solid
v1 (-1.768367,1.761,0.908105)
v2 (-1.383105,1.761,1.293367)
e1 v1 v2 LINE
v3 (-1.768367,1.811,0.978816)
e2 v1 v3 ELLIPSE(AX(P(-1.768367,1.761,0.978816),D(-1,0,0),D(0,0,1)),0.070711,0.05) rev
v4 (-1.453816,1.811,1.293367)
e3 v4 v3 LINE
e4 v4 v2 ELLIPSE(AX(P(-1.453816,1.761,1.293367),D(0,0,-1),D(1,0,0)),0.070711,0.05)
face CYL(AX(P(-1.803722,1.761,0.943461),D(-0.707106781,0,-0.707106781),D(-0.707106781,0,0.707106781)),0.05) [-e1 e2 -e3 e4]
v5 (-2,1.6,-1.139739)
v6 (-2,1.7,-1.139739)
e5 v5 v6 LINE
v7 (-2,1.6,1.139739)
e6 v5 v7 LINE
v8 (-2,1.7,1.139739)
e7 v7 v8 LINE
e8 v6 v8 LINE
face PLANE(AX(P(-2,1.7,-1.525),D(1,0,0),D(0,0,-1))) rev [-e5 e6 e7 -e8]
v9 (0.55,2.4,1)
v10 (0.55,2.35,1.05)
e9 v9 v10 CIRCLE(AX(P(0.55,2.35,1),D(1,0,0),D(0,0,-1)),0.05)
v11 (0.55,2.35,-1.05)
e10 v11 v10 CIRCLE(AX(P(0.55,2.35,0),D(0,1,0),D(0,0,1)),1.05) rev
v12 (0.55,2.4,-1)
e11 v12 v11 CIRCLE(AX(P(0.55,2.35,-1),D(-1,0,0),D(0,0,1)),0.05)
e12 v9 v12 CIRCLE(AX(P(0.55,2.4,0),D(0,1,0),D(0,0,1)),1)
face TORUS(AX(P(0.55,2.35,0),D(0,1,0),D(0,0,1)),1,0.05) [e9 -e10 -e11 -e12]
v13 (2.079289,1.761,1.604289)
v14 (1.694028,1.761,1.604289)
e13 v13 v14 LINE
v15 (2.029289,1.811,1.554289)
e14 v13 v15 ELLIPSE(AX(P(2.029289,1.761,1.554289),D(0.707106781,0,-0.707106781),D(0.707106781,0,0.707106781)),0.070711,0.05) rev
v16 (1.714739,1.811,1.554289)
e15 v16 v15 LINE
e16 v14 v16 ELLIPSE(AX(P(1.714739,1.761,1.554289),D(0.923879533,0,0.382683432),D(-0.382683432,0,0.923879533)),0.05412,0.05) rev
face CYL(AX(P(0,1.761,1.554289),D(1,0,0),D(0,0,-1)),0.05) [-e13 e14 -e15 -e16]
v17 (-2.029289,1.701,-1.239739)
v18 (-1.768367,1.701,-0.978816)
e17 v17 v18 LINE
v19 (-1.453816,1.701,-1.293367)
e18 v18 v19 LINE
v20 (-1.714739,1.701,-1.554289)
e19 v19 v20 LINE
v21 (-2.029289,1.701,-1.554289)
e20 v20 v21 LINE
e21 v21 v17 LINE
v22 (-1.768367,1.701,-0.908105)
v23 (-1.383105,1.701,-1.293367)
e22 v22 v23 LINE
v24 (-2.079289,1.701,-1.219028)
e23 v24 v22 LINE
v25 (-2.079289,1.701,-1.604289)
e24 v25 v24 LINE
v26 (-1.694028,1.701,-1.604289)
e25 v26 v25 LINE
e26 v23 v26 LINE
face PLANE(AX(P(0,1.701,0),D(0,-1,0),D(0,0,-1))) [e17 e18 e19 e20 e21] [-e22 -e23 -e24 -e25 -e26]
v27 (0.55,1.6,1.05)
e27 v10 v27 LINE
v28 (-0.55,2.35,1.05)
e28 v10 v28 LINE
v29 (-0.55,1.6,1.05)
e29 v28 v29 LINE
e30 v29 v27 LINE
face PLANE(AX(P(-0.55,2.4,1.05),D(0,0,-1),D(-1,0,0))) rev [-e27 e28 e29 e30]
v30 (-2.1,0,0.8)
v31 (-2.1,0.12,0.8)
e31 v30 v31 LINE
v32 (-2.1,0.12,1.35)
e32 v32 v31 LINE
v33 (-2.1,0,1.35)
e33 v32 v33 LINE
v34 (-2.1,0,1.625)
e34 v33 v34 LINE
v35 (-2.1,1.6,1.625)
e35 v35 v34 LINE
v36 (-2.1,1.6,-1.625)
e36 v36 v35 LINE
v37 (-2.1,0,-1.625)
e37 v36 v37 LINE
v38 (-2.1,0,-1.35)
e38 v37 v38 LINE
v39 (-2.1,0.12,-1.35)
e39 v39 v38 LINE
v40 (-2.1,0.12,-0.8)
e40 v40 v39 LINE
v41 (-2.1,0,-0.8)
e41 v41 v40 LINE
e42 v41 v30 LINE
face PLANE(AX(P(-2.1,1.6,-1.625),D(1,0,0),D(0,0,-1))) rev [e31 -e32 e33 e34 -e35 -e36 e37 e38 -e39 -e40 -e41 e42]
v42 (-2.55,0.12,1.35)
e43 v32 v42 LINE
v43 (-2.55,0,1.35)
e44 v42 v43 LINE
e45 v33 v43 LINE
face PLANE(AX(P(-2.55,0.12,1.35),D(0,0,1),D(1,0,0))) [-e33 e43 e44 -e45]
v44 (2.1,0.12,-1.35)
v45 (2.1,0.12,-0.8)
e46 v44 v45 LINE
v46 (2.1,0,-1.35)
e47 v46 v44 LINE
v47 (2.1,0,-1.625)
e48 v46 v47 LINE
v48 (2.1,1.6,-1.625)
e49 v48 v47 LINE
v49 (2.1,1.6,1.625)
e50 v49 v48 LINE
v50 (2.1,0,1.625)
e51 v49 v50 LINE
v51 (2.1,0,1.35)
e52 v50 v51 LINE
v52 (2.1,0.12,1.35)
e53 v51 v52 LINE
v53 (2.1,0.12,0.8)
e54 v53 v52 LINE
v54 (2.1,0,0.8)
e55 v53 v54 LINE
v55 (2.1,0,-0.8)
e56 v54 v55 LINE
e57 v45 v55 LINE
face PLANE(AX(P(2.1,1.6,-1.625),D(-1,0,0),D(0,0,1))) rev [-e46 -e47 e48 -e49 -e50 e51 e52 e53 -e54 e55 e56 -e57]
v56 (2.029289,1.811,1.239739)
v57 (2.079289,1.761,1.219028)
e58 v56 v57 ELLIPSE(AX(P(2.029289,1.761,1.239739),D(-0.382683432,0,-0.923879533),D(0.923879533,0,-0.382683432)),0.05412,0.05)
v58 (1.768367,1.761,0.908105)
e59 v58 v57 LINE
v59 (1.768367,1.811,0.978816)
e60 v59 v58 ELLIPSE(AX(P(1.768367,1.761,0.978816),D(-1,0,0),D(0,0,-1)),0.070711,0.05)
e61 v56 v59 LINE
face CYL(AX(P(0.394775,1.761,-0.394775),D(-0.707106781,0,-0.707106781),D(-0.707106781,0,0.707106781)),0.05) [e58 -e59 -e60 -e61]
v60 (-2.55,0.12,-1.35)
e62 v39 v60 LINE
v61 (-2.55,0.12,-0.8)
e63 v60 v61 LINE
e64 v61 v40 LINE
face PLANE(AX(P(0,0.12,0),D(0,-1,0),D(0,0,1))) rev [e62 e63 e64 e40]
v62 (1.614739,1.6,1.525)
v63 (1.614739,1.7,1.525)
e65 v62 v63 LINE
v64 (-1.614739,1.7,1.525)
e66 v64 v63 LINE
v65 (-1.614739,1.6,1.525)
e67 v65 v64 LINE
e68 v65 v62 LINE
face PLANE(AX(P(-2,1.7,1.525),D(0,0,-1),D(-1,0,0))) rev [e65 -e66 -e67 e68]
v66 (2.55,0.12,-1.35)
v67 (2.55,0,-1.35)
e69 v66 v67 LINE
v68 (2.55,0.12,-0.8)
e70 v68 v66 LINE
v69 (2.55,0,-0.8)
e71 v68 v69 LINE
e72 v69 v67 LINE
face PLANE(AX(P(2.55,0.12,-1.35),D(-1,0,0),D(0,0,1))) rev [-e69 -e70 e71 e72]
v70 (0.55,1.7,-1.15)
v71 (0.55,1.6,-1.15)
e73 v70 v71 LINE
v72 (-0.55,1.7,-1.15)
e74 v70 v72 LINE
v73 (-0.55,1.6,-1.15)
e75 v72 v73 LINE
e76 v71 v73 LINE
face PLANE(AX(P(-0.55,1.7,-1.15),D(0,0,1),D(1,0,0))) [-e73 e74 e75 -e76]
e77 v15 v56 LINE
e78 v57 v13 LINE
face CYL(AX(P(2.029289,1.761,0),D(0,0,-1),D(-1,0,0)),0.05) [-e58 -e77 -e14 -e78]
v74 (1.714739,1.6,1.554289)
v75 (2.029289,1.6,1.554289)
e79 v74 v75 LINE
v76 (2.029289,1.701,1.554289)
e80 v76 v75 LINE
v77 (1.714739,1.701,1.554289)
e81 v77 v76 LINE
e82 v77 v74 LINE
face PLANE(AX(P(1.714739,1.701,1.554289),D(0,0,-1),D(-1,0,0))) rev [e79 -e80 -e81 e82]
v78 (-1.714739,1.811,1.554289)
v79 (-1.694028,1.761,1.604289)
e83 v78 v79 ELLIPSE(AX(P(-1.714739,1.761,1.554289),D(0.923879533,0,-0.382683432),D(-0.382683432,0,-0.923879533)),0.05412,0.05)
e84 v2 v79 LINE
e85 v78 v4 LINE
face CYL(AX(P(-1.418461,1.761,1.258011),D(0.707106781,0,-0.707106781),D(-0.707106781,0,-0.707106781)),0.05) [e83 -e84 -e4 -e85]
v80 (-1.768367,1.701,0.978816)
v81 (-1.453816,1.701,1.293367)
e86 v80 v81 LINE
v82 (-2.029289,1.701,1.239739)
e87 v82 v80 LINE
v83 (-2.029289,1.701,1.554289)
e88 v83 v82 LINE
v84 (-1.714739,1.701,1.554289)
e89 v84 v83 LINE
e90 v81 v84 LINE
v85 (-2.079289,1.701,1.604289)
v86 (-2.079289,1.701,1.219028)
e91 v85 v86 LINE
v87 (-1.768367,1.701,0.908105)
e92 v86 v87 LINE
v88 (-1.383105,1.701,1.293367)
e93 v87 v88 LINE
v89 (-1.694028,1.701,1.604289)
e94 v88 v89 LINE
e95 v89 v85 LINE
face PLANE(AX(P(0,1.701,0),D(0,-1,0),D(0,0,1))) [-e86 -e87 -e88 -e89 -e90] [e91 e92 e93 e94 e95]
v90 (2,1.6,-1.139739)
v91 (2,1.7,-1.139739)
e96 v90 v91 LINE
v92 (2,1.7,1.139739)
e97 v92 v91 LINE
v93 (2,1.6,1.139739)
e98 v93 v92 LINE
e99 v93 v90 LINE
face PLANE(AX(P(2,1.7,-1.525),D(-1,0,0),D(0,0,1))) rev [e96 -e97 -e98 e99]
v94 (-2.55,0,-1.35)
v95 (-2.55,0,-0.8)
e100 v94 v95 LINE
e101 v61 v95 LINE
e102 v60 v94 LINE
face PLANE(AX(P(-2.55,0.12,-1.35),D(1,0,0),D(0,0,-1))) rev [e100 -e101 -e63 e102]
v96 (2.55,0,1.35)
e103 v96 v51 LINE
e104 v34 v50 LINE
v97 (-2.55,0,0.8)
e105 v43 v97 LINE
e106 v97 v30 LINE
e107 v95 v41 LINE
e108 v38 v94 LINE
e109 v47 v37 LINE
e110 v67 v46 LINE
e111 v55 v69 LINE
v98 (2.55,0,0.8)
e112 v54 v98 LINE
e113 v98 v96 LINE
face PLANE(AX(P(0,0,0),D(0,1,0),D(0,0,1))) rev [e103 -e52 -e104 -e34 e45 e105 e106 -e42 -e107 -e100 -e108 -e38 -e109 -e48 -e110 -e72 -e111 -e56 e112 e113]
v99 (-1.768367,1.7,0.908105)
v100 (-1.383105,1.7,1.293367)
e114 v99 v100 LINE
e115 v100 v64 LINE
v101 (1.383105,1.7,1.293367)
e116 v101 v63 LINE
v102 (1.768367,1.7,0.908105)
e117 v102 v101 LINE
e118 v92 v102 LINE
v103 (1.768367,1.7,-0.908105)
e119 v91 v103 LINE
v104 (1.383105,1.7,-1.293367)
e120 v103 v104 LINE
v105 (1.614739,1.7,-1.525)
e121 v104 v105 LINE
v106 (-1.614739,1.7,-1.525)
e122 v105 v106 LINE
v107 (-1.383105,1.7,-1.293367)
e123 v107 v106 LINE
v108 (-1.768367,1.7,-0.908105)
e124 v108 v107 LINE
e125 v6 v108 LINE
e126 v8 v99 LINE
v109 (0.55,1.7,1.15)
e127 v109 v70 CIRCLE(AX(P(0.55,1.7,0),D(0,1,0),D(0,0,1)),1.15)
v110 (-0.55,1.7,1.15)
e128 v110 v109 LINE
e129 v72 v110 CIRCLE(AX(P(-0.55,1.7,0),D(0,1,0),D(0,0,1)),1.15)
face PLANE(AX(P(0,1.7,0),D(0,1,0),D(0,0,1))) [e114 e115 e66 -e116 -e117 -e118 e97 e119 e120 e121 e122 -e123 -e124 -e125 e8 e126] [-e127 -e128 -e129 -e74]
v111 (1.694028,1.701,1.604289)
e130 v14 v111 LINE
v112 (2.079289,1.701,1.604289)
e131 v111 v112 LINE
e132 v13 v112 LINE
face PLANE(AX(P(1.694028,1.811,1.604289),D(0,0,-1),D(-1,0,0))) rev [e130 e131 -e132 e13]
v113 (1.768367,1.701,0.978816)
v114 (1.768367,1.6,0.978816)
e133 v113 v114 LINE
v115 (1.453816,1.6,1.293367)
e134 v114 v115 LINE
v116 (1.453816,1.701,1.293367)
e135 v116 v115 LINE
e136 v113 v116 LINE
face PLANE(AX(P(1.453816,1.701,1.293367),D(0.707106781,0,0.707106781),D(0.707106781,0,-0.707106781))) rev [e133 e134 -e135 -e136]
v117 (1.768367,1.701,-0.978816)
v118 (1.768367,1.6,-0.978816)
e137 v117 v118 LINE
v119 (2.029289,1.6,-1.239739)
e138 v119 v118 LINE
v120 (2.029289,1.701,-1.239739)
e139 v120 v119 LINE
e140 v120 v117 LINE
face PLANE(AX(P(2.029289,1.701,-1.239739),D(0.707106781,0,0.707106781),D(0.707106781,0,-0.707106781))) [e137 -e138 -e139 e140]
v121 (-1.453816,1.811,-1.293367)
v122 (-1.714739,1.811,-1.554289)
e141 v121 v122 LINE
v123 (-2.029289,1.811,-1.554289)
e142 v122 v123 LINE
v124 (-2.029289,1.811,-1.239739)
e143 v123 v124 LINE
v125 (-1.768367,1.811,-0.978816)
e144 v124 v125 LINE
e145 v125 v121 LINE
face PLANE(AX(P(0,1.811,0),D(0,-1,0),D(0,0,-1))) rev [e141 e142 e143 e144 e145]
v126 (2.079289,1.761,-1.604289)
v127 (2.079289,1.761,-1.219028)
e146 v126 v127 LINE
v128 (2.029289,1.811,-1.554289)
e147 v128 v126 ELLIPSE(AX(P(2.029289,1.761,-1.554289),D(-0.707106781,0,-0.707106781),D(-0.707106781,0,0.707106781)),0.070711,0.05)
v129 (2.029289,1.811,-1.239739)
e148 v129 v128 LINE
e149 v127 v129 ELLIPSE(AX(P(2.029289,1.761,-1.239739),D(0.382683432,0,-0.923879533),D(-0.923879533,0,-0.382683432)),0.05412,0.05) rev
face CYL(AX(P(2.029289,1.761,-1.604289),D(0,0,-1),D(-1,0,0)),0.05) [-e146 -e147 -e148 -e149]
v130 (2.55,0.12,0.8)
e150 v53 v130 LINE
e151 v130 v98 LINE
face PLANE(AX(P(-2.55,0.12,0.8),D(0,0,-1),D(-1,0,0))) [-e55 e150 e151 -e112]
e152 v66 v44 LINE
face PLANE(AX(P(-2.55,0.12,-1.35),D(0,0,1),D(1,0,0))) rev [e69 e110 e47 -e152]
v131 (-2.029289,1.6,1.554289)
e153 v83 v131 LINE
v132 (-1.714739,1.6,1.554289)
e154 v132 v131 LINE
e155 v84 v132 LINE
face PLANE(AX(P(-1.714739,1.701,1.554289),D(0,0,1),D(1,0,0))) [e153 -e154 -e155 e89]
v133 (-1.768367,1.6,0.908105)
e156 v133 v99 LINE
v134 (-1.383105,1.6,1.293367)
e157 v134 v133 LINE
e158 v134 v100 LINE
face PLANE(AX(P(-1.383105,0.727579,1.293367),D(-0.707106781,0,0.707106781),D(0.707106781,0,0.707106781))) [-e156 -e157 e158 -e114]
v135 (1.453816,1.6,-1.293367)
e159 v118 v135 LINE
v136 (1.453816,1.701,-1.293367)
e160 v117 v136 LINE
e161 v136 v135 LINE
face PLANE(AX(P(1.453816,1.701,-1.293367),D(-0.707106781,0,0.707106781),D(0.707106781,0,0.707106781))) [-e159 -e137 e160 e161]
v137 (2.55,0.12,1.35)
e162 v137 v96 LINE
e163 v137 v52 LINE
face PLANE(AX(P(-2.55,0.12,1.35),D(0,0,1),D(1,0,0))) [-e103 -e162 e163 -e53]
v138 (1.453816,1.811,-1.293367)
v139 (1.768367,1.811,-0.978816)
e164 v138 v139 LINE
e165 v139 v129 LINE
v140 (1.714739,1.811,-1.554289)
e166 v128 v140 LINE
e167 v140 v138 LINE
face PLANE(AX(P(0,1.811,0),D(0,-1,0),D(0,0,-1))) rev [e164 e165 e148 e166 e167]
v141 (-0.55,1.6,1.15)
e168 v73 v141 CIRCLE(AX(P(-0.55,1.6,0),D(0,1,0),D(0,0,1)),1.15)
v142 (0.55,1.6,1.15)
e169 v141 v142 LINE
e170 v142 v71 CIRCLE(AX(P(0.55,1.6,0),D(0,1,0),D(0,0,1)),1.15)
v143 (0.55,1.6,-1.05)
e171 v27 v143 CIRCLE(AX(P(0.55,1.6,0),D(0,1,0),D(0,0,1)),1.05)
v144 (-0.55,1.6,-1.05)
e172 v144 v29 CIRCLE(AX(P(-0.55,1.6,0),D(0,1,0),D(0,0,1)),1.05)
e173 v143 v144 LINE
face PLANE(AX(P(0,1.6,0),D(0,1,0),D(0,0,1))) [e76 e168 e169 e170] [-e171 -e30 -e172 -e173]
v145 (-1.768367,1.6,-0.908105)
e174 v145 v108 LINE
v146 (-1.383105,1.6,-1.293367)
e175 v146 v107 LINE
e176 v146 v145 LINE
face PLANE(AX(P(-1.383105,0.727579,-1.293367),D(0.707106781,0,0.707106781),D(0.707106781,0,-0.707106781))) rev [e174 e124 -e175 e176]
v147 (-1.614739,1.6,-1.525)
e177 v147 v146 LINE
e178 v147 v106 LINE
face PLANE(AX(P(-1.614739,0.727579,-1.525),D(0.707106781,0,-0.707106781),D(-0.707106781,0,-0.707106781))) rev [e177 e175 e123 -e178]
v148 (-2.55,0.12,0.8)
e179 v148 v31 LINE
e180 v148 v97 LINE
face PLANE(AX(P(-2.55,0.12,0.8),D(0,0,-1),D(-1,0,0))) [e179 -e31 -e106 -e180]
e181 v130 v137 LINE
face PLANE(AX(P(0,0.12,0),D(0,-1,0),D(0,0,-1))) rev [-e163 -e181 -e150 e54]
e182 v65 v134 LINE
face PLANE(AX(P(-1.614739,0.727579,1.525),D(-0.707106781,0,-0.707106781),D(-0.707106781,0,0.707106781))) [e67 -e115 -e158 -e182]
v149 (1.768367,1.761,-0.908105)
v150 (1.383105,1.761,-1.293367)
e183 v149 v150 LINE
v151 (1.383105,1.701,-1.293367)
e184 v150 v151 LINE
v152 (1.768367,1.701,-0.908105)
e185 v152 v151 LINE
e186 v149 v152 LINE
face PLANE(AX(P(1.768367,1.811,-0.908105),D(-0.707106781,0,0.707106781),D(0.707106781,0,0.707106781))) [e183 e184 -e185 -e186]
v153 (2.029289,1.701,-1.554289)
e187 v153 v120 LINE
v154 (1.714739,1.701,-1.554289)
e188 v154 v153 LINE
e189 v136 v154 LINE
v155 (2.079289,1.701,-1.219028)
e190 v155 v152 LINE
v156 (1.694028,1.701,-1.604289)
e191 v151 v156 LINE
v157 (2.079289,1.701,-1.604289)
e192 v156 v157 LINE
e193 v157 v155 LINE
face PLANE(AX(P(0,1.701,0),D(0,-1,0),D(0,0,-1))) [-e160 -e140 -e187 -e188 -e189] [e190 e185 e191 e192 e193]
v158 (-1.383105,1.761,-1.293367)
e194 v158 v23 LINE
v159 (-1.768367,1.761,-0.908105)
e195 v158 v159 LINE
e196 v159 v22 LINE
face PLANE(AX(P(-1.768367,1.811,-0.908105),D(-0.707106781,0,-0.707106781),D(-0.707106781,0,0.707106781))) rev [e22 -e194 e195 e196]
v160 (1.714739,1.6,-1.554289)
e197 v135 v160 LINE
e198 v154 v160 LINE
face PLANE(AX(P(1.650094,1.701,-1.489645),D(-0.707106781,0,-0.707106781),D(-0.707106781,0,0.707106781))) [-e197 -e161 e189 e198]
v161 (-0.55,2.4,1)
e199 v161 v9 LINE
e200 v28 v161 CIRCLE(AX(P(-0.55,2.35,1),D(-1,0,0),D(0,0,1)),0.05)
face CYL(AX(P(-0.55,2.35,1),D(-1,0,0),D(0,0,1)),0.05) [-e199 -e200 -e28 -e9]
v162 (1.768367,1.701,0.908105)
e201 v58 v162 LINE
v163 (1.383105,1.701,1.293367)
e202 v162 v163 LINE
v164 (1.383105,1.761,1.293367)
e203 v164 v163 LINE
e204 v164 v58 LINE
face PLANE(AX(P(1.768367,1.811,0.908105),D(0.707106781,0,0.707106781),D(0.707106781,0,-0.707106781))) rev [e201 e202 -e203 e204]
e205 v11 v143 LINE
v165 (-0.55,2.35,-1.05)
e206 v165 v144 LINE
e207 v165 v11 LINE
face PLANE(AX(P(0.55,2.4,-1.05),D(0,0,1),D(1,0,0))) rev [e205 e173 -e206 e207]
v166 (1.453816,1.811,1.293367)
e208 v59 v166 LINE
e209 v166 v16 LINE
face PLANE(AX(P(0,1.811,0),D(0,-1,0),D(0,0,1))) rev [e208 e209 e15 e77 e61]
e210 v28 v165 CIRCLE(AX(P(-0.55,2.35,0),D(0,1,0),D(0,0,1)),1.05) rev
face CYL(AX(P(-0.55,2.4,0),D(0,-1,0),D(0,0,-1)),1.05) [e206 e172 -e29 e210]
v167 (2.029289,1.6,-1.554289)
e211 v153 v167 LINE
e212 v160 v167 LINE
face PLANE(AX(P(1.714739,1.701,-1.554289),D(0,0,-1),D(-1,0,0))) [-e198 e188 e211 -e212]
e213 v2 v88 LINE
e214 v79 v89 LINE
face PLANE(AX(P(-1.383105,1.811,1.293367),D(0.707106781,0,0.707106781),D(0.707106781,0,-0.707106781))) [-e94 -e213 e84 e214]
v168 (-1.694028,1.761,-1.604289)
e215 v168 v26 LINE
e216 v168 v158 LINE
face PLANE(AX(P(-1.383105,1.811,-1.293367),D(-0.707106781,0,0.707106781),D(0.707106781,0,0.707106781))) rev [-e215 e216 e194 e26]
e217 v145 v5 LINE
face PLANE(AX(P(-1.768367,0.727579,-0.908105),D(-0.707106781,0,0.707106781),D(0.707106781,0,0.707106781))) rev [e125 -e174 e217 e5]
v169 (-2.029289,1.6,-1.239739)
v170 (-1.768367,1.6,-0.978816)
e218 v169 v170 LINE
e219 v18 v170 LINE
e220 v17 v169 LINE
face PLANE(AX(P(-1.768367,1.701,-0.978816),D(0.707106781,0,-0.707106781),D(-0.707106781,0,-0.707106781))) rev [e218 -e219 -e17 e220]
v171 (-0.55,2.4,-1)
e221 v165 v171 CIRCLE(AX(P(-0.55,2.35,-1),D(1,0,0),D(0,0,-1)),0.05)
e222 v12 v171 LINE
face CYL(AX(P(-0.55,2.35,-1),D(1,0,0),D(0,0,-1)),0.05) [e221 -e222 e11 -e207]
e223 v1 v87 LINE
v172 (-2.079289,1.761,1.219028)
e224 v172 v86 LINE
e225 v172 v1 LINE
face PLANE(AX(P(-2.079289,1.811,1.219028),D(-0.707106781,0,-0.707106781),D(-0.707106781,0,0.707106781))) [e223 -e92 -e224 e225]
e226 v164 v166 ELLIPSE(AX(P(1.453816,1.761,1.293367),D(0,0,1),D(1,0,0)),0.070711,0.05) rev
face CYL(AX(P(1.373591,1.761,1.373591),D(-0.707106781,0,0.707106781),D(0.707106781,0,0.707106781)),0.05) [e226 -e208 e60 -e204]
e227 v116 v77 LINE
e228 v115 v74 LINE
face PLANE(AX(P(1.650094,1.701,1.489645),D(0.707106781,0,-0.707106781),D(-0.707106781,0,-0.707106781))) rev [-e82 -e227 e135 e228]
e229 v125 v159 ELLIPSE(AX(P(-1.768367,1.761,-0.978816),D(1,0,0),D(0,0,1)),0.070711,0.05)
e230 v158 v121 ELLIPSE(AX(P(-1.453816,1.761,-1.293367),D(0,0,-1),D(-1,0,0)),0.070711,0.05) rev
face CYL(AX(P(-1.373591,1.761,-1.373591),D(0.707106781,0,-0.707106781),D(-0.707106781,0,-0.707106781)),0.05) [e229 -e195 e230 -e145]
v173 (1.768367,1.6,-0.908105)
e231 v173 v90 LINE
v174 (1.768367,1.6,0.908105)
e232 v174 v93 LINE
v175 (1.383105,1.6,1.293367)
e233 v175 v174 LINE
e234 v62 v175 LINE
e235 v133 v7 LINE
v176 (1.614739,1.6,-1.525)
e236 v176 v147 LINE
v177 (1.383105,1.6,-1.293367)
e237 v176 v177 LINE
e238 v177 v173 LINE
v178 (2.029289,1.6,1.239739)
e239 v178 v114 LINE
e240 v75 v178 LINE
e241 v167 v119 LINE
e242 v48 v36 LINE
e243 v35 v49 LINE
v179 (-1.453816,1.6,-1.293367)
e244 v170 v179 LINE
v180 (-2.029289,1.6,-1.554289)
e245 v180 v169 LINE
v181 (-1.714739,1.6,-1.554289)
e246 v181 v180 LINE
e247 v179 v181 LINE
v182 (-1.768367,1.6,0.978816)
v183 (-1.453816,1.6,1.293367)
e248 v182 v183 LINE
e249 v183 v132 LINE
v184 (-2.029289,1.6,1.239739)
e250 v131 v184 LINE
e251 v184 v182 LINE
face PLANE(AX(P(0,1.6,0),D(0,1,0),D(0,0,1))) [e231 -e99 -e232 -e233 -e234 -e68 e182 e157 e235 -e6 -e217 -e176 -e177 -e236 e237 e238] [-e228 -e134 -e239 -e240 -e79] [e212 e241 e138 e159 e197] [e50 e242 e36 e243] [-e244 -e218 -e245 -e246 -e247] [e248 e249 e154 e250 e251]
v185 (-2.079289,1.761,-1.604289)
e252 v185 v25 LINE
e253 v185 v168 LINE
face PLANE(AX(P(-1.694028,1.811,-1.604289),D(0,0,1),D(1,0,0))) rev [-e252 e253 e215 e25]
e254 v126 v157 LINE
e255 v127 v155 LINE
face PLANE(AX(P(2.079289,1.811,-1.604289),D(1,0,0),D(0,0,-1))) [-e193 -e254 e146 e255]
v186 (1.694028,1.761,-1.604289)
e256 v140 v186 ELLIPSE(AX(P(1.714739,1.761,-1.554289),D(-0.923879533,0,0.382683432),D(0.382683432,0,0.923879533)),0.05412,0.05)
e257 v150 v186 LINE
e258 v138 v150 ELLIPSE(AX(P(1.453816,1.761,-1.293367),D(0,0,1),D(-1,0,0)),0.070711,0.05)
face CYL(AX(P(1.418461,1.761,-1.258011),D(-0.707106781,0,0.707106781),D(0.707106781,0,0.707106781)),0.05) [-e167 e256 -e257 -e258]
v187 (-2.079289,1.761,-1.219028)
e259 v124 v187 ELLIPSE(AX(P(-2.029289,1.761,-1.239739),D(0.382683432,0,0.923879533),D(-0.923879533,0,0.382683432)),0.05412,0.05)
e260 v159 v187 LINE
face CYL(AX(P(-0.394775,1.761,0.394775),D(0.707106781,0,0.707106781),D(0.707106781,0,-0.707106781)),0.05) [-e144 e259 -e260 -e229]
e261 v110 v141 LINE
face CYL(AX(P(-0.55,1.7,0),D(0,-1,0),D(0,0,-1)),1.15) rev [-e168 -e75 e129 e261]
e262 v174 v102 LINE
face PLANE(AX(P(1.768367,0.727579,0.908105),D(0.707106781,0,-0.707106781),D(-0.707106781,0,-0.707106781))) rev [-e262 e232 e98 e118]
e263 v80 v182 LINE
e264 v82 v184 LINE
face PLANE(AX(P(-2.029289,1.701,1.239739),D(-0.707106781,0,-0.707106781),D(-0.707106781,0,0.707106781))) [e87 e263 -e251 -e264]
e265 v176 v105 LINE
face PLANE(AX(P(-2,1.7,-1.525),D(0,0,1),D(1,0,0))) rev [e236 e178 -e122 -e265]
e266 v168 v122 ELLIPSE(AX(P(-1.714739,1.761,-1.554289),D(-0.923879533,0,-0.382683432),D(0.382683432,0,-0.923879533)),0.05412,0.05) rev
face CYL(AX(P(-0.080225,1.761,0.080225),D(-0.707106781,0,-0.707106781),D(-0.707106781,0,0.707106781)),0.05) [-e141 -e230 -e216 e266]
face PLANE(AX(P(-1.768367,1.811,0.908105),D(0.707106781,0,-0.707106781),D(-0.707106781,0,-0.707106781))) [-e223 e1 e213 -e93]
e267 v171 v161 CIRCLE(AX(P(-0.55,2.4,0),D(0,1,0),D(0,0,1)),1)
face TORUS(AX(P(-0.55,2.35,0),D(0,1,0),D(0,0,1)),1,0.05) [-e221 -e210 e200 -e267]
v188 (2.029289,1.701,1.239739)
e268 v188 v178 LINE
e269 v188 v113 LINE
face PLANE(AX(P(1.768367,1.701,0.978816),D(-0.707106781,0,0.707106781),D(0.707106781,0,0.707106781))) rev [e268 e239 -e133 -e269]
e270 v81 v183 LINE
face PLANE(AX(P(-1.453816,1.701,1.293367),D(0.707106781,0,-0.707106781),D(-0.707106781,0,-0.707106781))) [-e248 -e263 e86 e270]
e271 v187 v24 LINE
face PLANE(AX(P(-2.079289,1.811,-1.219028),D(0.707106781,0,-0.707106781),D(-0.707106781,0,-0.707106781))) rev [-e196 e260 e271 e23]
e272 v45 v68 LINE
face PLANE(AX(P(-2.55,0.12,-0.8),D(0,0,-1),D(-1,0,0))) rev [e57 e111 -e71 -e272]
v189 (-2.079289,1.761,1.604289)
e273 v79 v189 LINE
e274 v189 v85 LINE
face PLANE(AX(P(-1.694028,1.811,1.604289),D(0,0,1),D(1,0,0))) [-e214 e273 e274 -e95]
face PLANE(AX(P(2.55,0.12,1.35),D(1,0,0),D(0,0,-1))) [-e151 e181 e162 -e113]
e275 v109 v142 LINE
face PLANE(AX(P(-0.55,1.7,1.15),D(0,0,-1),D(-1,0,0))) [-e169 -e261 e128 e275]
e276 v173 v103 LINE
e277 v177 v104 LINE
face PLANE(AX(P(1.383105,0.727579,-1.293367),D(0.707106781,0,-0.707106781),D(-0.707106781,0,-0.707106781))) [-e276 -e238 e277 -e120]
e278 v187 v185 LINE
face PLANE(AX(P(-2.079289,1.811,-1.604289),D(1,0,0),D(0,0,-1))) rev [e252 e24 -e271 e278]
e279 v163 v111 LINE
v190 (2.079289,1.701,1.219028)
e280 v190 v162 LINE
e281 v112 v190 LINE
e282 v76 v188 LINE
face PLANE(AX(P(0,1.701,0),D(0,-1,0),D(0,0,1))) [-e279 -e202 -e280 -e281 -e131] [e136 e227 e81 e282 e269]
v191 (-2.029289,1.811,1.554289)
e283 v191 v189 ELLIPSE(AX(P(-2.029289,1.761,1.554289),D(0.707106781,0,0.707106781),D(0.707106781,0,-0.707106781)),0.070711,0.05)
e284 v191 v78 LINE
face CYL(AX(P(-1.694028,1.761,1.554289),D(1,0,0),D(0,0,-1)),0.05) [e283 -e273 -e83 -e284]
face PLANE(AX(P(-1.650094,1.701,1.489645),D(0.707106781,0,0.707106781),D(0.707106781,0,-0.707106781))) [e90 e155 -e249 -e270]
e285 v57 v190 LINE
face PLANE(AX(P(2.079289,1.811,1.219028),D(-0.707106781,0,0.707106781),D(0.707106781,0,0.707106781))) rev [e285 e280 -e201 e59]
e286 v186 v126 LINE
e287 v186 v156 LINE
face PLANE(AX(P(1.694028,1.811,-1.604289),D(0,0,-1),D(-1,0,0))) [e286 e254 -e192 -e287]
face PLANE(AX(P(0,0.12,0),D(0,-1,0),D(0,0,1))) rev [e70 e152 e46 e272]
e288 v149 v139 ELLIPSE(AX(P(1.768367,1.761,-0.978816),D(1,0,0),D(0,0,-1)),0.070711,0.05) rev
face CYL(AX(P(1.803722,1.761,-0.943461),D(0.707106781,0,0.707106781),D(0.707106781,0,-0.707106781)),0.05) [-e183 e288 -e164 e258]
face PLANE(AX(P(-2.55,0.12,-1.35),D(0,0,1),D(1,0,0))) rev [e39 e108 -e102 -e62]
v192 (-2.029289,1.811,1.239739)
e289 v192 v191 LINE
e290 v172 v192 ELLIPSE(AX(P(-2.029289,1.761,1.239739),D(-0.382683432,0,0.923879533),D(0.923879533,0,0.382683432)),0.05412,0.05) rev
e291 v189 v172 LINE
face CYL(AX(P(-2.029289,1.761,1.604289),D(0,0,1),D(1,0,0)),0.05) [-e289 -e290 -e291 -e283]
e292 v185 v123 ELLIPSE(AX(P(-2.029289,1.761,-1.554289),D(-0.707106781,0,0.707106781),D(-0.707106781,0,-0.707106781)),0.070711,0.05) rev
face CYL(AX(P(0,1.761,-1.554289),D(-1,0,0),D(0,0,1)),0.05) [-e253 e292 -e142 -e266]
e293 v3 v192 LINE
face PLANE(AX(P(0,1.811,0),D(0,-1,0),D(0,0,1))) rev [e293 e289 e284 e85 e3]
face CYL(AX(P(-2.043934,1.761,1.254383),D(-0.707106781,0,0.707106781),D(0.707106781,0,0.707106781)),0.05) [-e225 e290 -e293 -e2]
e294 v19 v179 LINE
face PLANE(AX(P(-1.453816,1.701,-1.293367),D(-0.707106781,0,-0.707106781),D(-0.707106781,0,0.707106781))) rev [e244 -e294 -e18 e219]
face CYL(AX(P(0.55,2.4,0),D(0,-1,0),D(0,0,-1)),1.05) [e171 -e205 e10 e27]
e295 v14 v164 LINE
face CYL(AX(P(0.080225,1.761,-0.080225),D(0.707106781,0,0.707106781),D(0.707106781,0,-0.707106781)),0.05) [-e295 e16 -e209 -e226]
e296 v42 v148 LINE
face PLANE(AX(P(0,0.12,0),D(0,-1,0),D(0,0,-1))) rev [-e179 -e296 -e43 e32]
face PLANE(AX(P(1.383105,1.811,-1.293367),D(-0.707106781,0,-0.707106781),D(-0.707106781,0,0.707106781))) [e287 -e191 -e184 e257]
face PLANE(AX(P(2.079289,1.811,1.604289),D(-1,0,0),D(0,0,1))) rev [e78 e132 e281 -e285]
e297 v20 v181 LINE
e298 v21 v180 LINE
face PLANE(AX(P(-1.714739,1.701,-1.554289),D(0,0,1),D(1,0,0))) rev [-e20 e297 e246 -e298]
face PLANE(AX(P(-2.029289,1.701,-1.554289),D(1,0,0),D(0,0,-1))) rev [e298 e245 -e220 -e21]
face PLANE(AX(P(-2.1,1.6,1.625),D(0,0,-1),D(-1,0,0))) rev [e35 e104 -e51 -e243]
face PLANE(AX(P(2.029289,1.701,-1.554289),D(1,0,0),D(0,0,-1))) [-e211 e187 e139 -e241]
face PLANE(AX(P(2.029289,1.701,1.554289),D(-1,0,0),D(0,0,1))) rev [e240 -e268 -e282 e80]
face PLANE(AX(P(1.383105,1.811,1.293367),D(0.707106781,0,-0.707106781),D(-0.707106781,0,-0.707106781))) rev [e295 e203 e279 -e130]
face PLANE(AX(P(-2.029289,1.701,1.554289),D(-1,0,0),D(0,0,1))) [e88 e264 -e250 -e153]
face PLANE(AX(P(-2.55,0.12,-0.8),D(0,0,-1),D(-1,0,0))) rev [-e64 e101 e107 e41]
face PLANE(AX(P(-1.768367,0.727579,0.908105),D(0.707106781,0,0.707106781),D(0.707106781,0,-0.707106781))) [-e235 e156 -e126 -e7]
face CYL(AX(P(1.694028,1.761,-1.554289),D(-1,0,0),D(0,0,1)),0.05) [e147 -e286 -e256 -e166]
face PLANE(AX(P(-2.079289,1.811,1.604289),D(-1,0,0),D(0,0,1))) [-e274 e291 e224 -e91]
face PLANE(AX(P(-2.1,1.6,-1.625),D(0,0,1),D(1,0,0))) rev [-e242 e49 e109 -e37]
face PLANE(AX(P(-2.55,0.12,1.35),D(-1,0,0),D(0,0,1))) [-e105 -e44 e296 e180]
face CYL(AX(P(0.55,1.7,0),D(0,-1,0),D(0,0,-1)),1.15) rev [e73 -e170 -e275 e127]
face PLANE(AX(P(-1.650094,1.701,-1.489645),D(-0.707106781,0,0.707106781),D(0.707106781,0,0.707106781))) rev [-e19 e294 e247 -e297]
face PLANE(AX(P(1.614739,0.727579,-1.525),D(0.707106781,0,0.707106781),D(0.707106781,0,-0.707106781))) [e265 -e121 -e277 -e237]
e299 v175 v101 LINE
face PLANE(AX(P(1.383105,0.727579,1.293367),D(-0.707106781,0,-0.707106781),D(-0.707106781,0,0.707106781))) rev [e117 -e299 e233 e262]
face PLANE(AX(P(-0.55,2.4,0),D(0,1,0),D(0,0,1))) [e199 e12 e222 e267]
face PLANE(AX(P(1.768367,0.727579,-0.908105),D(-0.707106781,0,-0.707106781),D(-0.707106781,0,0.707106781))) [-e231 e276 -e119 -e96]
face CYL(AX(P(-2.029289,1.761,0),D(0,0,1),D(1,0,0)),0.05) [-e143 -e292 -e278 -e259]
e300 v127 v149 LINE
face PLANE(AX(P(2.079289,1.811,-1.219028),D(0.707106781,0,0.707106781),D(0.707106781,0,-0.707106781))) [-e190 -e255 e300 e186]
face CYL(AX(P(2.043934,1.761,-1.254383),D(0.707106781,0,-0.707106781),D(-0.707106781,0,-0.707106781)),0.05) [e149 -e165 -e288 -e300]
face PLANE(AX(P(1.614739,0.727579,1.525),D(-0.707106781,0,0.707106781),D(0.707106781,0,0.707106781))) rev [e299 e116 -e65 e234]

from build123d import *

# Parameters (mm, degrees)
SKETCH1_W            = 4.2
SKETCH1_H            = 3.25
BOSS_EXTRUDE1_DEPTH  = 1.6
SKETCH2_W            = 4
SKETCH2_H            = 3.05
BOSS_EXTRUDE2_DEPTH  = 0.1
BOSS_EXTRUDE3_DEPTH  = 0.8
SKETCH4_W            = 5.1
SKETCH4_H            = 0.55
LEAD_DEPTH           = 0.12
FILLET1_R            = 0.05
CUT_EXTRUDE1_DEPTH   = 0.1
MIRROR4_COPY_1_DEPTH = 0.1
BOSS_EXTRUDE5_DEPTH  = 0.101
BOSS_EXTRUDE6_DEPTH  = 0.11
FILLET3_R            = 0.05
FILLET3_OF_MIRROR6_R = 0.05


# Read off the part's stored shape, not the designer's step: Mirror7
with BuildPart() as part:
    # Sketch1 → Boss-Extrude1 (new body)
    with BuildSketch(Plane(origin=(0, 0, 0), x_dir=(1, 0, 0), z_dir=(0, 1, 0))):
        Rectangle(SKETCH1_W, SKETCH1_H)
    extrude(amount=BOSS_EXTRUDE1_DEPTH)

    # Sketch2 → Boss-Extrude2 (add)
    with BuildSketch(Plane(origin=(0, 1.6, 0), x_dir=(1, 0, 0), z_dir=(0, 1, 0))):
        Rectangle(SKETCH2_W, SKETCH2_H)
        with BuildLine():
            Line((-0.55, 1.15), (0.55, 1.15))
            ThreePointArc((0.55, 1.15), (1.7, 0), (0.55, -1.15))
            Line((0.55, -1.15), (-0.55, -1.15))
            ThreePointArc((-0.55, -1.15), (-1.7, 0), (-0.55, 1.15))
        make_face(mode=Mode.SUBTRACT)
    extrude(amount=BOSS_EXTRUDE2_DEPTH)

    # Sketch3 → Boss-Extrude3 (add)
    with BuildSketch(Plane(origin=(0, 1.6, 0), x_dir=(1, 0, 0), z_dir=(0, 1, 0))):
        with BuildLine():
            Line((-0.55, -1.05), (0.55, -1.05))
            ThreePointArc((0.55, -1.05), (1.6, 0), (0.55, 1.05))
            Line((0.55, 1.05), (-0.55, 1.05))
            ThreePointArc((-0.55, 1.05), (-1.6, 0), (-0.55, -1.05))
        make_face()
    extrude(amount=BOSS_EXTRUDE3_DEPTH)

    # Sketch4 → lead (add)
    with BuildSketch(Plane.XZ):
        with Locations((0, 1.075)):
            Rectangle(SKETCH4_W, SKETCH4_H)
    lead = extrude(amount=-LEAD_DEPTH)

    # Mirror1: lead across plane
    add(lead.mirror(Plane.XY))

    # Fillet1
    fillet1_edges = [part.edges().sort_by_distance(p)[0] for p in [
        (-1.6, 2.4, 0),
        (0, 2.4, 1.05),
        (1.6, 2.4, 0),
        (0, 2.4, -1.05),
    ]]
    fillet(fillet1_edges, radius=FILLET1_R)

    # Sketch5 → Cut-Extrude1 (cut)
    with BuildSketch(Plane(origin=(0, 1.7, 0), x_dir=(1, 0, 0), z_dir=(0, 1, 0))):
        Polygon((-2, 1.525), (-2, 1.139738664), (-1.768366599, 0.908105264), (-1.383105264, 1.293366599), (-1.614738664, 1.525), align=None)
    cut_extrude1 = extrude(amount=-CUT_EXTRUDE1_DEPTH, mode=Mode.SUBTRACT)

    # Mirror3: Cut-Extrude1 across plane
    add(cut_extrude1.mirror(Plane(origin=(0, 0, 0), x_dir=(0, 0, 1), z_dir=(1, 0, 0))), mode=Mode.SUBTRACT)

    # Mirror4: Cut-Extrude1 across plane
    add(cut_extrude1.mirror(Plane.XY), mode=Mode.SUBTRACT)

    # Mirror4 copy 1 sketch → Mirror4 copy 1 (cut)
    with BuildSketch(Plane(origin=(0, 1.7, 0), x_dir=(-1, 0, 0), z_dir=(0, 1, 0))):
        Polygon((-2, 1.525), (-2, 1.139738664), (-1.768366599, 0.908105264), (-1.383105264, 1.293366599), (-1.614738664, 1.525), align=None)
    extrude(amount=-MIRROR4_COPY_1_DEPTH, mode=Mode.SUBTRACT)

    # Sketch6 → Boss-Extrude5 (add)
    with BuildSketch(Plane(origin=(0, 1.6, 0), x_dir=(1, 0, 0), z_dir=(0, 1, 0))):
        Polygon((-1.650094004, 1.489644661), (-1.714738664, 1.554289322), (-2.029289322, 1.554289322), (-2.029289322, 1.239738664), (-1.964644661, 1.175094004), (-1.768366599, 0.978815942), (-1.453815942, 1.293366599), align=None)
    boss_extrude5 = extrude(amount=BOSS_EXTRUDE5_DEPTH)

    # Sketch7 → Boss-Extrude6 (add)
    with BuildSketch(Plane(origin=(0, 1.701, 0), x_dir=(1, 0, 0), z_dir=(0, 1, 0))):
        Polygon((-1.694027986, 1.604289322), (-2.079289322, 1.604289322), (-2.079289322, 1.219027986), (-1.768366599, 0.908105264), (-1.383105264, 1.293366599), align=None)
    boss_extrude6 = extrude(amount=BOSS_EXTRUDE6_DEPTH)

    # Fillet3
    fillet3_edges = [part.edges().sort_by_distance(p)[0] for p in [
        (-1.538566625, 1.811, -1.44882796),
        (-1.886658654, 1.811, -1.604289322),
        (-2.079289322, 1.811, -1.411658654),
        (-1.92382796, 1.811, -1.063566625),
        (-1.575735931, 1.811, -1.100735931),
    ]]
    fillet(fillet3_edges, radius=FILLET3_R)

    # Mirror6: Boss-Extrude5, Boss-Extrude6 across plane
    add(boss_extrude5.mirror(Plane(origin=(0, 0, 0), x_dir=(0, 0, 1), z_dir=(1, 0, 0))))
    add(boss_extrude6.mirror(Plane(origin=(0, 0, 0), x_dir=(0, 0, 1), z_dir=(1, 0, 0))))

    # Fillet3 of Mirror6
    fillet3_of_mirror6_edges = [part.edges().sort_by_distance(p)[0] for p in [
        (1.538566625, 1.811, -1.44882796),
        (1.886658654, 1.811, -1.604289322),
        (2.079289322, 1.811, -1.411658654),
        (1.92382796, 1.811, -1.063566625),
        (1.575735931, 1.811, -1.100735931),
    ]]
    fillet(fillet3_of_mirror6_edges, radius=FILLET3_OF_MIRROR6_R)

    # Mirror7: part across plane


with BuildPart() as part_1:
    add(part.part)
    add(part.part.mirror(Plane.XY))


solid = part_1.part
